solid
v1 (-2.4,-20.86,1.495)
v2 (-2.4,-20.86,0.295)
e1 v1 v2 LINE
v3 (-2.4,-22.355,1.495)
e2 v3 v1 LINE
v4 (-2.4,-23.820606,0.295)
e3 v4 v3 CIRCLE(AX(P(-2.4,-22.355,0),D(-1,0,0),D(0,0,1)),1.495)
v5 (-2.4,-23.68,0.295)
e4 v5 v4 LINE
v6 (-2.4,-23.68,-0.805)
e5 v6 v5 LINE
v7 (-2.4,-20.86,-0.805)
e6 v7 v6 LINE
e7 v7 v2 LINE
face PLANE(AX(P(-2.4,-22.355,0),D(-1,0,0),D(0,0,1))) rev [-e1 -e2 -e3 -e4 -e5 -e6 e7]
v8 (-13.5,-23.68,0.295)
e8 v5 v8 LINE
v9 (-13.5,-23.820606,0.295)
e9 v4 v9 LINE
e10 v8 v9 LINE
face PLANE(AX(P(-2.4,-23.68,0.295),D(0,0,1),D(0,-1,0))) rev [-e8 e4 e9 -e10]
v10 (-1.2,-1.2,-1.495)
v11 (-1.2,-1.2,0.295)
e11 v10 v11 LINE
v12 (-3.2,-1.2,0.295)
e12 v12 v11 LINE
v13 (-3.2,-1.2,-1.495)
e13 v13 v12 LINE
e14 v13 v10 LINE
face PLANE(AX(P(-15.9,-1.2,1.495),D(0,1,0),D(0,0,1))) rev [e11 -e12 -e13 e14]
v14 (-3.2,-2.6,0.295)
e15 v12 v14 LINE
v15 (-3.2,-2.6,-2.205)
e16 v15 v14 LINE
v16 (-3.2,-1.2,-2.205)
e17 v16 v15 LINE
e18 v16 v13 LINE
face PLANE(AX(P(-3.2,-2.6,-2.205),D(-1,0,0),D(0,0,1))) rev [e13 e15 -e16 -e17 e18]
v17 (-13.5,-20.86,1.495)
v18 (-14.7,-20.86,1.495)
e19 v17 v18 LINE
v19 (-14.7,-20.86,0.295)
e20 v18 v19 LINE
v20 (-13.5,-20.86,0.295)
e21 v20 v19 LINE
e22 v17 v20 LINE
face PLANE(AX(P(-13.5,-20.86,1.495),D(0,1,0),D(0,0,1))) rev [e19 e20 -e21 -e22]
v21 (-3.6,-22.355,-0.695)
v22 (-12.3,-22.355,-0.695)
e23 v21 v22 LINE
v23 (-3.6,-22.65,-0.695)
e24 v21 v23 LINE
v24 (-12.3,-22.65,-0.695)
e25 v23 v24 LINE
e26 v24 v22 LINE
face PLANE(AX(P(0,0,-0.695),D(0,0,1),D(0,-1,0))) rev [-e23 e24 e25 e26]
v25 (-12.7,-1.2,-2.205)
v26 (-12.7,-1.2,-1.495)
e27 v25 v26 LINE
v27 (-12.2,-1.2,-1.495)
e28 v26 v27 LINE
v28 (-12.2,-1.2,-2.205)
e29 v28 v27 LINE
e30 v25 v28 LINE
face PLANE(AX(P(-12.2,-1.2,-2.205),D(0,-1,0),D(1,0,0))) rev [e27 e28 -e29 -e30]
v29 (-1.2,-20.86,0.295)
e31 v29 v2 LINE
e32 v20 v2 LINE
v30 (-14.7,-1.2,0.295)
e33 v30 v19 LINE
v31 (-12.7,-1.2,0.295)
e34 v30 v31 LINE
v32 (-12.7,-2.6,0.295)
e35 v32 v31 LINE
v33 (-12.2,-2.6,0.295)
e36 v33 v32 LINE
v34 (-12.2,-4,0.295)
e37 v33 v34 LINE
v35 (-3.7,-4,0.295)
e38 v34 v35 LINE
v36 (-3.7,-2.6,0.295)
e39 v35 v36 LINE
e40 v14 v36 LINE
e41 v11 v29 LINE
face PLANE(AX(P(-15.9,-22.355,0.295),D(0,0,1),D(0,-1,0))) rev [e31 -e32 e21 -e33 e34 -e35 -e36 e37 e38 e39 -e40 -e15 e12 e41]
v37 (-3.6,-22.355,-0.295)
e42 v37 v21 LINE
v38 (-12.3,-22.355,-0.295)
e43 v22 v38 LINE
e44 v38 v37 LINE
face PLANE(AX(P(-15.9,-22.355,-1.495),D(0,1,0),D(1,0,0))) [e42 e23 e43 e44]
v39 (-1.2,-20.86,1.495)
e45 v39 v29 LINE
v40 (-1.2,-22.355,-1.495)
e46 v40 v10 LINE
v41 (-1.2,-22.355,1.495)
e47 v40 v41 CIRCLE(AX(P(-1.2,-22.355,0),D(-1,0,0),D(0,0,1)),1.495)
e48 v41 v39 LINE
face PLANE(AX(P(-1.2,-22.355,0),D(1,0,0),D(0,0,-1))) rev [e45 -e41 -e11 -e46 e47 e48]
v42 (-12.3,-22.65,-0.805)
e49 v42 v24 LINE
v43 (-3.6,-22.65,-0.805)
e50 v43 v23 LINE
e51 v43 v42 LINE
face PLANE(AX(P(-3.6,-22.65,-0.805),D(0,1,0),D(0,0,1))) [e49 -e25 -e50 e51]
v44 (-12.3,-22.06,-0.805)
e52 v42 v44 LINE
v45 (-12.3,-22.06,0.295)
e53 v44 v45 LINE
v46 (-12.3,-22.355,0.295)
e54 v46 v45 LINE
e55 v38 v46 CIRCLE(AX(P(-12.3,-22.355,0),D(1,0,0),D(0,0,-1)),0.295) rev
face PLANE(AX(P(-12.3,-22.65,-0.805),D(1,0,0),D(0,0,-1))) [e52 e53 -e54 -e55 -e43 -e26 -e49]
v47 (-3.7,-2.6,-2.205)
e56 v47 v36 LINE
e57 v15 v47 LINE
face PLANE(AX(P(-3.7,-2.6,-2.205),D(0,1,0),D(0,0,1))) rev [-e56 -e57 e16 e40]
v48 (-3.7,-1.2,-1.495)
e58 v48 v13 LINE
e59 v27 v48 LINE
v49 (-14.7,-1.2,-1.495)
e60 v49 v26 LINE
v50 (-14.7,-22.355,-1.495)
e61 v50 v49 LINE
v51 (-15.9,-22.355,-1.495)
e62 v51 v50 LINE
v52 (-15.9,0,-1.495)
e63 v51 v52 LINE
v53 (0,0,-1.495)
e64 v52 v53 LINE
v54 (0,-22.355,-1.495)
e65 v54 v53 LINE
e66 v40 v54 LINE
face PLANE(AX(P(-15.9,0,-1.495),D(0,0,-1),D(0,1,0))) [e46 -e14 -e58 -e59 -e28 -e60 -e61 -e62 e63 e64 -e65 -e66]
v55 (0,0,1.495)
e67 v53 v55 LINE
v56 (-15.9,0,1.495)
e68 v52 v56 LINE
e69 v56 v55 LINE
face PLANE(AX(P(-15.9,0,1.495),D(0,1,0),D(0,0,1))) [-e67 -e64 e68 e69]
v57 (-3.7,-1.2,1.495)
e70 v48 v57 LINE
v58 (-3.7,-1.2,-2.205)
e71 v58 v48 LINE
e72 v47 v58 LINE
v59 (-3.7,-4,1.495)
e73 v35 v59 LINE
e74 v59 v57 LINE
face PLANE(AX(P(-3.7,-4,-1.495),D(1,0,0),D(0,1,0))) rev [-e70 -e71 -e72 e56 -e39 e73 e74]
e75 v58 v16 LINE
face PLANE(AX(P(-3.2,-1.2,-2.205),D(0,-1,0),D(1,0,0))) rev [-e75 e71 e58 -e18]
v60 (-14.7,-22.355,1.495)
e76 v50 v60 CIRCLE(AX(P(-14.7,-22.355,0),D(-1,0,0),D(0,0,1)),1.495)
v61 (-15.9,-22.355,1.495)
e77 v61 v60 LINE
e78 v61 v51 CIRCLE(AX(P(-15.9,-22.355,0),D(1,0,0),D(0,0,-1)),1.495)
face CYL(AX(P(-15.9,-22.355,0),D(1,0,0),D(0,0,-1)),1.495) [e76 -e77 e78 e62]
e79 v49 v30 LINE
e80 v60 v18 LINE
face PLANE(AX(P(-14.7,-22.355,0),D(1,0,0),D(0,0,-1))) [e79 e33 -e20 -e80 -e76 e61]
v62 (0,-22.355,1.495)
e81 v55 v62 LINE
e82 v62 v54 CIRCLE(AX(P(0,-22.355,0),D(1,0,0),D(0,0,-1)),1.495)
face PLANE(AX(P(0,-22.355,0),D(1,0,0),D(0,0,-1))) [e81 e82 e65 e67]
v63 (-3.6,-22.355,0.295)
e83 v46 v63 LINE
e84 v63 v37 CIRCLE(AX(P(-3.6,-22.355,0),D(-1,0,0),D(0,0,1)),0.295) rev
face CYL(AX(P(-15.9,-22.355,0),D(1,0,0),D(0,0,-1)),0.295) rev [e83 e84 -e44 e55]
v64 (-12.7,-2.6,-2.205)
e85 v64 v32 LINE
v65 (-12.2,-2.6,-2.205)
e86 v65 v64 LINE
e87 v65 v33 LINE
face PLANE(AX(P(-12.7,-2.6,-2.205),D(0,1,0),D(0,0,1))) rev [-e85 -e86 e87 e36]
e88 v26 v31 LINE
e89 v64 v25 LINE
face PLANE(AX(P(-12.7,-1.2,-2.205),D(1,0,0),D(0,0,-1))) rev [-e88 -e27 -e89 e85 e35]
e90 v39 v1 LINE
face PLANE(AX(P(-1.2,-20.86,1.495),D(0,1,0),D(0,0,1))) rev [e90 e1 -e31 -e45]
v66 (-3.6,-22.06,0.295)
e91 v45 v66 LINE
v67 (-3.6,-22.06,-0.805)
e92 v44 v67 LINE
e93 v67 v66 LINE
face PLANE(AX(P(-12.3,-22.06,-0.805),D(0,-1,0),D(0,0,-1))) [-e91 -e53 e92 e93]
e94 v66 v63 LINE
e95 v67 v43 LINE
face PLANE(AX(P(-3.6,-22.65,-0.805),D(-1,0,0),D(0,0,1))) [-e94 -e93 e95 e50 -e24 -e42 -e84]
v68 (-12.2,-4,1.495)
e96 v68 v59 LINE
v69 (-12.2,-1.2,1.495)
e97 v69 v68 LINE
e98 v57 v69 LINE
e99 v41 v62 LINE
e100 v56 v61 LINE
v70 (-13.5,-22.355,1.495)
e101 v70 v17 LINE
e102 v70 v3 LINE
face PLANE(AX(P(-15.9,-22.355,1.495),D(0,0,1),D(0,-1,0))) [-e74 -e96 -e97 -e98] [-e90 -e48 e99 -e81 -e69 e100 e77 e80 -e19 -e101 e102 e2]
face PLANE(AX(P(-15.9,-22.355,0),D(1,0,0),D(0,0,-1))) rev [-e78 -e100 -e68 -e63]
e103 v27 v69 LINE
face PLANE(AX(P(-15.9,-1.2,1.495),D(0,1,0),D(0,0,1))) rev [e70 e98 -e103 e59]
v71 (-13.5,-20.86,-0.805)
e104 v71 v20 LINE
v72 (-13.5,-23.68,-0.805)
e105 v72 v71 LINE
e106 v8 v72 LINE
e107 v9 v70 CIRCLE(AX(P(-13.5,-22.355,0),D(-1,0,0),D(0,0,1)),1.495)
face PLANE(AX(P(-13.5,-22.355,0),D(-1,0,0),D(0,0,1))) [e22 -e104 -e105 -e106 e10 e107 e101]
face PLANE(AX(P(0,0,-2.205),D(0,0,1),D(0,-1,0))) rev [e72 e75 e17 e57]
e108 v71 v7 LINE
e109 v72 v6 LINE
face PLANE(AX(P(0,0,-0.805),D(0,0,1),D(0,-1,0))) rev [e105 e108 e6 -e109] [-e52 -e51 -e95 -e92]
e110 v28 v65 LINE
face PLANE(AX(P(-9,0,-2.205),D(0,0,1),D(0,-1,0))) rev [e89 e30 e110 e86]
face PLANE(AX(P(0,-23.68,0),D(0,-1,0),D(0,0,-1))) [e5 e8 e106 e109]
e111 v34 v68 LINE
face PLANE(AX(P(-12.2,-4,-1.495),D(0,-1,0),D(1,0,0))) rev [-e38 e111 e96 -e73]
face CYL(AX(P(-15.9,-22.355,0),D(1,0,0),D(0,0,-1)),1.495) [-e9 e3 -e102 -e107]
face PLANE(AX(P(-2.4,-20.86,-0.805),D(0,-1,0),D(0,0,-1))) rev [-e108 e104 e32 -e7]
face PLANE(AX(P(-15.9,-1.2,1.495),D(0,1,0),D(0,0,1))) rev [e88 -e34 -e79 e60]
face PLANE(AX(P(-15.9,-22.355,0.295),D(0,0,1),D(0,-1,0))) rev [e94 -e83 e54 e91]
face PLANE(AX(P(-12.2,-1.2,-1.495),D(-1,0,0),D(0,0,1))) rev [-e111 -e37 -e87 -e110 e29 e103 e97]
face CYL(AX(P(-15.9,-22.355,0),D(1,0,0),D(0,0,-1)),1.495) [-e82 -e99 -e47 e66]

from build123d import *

# Parameters (mm, degrees)
BOSS_EXTRUDE1_DEPTH     = 15.9
SHELL1_START            = -14.7
SHELL1_DEPTH            = 13.5
CUT_EXTRUDE1_DEPTH      = 29.819656487
CUT_EXTRUDE1_DEPTH_BACK = 29.819656487
SKETCH3_W               = 8.5
SKETCH3_H               = 2.8
CUT_EXTRUDE2_START      = -1.2
CUT_EXTRUDE2_DEPTH      = 1.2
LPATTERN1_COUNT         = 2
LPATTERN1_PITCH         = 12.3
SKETCH5_W               = 11.1
SKETCH5_H               = 2.99
CUT_EXTRUDE5_DEPTH      = 0.8
SKETCH6_W               = 8.7
SKETCH6_H               = 0.59
BOSS_EXTRUDE2_DEPTH     = 1.1
SKETCH7_W               = 11.1
SKETCH7_H               = 1.1
CUT_EXTRUDE6_DEPTH      = 0.17
SKETCH8_W               = 0.5
SKETCH8_H               = 1.4
BOSS_EXTRUDE3_DEPTH     = 2.5
LPATTERN2_COUNT         = 2
LPATTERN2_PITCH         = 9


# Read off the part's stored shape, not the designer's step: Shell1
with BuildPart() as part:
    # Sketch2 → Boss-Extrude1 (new body)
    with BuildSketch(Plane(origin=(0, 0, 0), x_dir=(0, 0, -1), z_dir=(1, 0, 0))):
        with BuildLine():
            Line((-1.495, 0), (1.495, 0))
            Line((1.495, 0), (1.495, -22.355))
            ThreePointArc((1.495, -22.355), (0, -23.85), (-1.495, -22.355))
            Line((-1.495, -22.355), (-1.495, 0))
        make_face()
    extrude(amount=-BOSS_EXTRUDE1_DEPTH)

    # Shell1 outline → Shell1 (cut)
    with BuildSketch(Plane.YZ.offset(SHELL1_START)):
        with BuildLine():
            Line((-22.355, -0.295), (-22.355, -1.495))
            Line((-22.355, -1.495), (-1.2, -1.495))
            Line((-1.2, -1.495), (-1.2, 0.295))
            Line((-1.2, 0.295), (-22.355, 0.295))
            ThreePointArc((-22.355, 0.295), (-22.65, 0), (-22.355, -0.295))
        make_face()
    extrude(amount=SHELL1_DEPTH, mode=Mode.SUBTRACT)

    # Sketch3 → Cut-Extrude1 (cut, two sides: drawn at the far end of the back side and taken through both)
    with BuildSketch(Plane.XY.offset(1.495).offset(-CUT_EXTRUDE1_DEPTH_BACK)):
        with Locations((-7.95, -2.6)):
            Rectangle(SKETCH3_W, SKETCH3_H)
    extrude(amount=CUT_EXTRUDE1_DEPTH + CUT_EXTRUDE1_DEPTH_BACK, mode=Mode.SUBTRACT)

    # Sketch4 → Cut-Extrude2 (cut)
    with BuildSketch(Plane.ZY.offset(14.7).offset(CUT_EXTRUDE2_START)):
        with BuildLine():
            Line((1.495, -20.86), (-1.495, -20.86))
            Line((-1.495, -20.86), (-1.495, -22.355))
            ThreePointArc((-1.495, -22.355), (0, -23.85), (1.495, -22.355))
            Line((1.495, -22.355), (1.495, -20.86))
        make_face()
    cut_extrude2 = extrude(amount=CUT_EXTRUDE2_DEPTH, mode=Mode.SUBTRACT)

    # LPattern1: Cut-Extrude2 ×2
    with Locations(*[(i * LPATTERN1_PITCH, 0, 0) for i in range(1, LPATTERN1_COUNT)]):
        add(cut_extrude2, mode=Mode.SUBTRACT)

    # Sketch5 → Cut-Extrude5 (cut)
    with BuildSketch(Plane(origin=(0, 0, -1.495), x_dir=(-1, 0, 0), z_dir=(0, 0, -1))):
        with Locations((7.95, -22.355)):
            Rectangle(SKETCH5_W, SKETCH5_H)
    extrude(amount=-CUT_EXTRUDE5_DEPTH, mode=Mode.SUBTRACT)

    # Sketch6 → Boss-Extrude2 (add)
    with BuildSketch(Plane(origin=(0, 0, 0.295), x_dir=(-1, 0, 0), z_dir=(0, 0, -1))):
        Polygon((2.4, -20.86), (13.5, -20.86), (13.5, -23.85), (12.3, -23.85), (3.6, -23.85), (2.4, -23.85), align=None)
        with Locations((7.95, -22.355)):
            Rectangle(SKETCH6_W, SKETCH6_H, mode=Mode.SUBTRACT)
    extrude(amount=BOSS_EXTRUDE2_DEPTH)

    # Sketch7 → Cut-Extrude6 (cut)
    with BuildSketch(Plane.XZ.offset(23.85)):
        with Locations((-7.95, -0.255)):
            Rectangle(SKETCH7_W, SKETCH7_H)
    extrude(amount=-CUT_EXTRUDE6_DEPTH, mode=Mode.SUBTRACT)

    # Sketch8 → Boss-Extrude3 (add)
    with BuildSketch(Plane(origin=(0, 0, 0.295), x_dir=(-1, 0, 0), z_dir=(0, 0, -1))):
        with Locations((3.45, -1.9)):
            Rectangle(SKETCH8_W, SKETCH8_H)
    boss_extrude3 = extrude(amount=BOSS_EXTRUDE3_DEPTH)

    # LPattern2: Boss-Extrude3 ×2
    with Locations(*[(-i * LPATTERN2_PITCH, 0, 0) for i in range(1, LPATTERN2_COUNT)]):
        add(boss_extrude3)


solid = part.part
